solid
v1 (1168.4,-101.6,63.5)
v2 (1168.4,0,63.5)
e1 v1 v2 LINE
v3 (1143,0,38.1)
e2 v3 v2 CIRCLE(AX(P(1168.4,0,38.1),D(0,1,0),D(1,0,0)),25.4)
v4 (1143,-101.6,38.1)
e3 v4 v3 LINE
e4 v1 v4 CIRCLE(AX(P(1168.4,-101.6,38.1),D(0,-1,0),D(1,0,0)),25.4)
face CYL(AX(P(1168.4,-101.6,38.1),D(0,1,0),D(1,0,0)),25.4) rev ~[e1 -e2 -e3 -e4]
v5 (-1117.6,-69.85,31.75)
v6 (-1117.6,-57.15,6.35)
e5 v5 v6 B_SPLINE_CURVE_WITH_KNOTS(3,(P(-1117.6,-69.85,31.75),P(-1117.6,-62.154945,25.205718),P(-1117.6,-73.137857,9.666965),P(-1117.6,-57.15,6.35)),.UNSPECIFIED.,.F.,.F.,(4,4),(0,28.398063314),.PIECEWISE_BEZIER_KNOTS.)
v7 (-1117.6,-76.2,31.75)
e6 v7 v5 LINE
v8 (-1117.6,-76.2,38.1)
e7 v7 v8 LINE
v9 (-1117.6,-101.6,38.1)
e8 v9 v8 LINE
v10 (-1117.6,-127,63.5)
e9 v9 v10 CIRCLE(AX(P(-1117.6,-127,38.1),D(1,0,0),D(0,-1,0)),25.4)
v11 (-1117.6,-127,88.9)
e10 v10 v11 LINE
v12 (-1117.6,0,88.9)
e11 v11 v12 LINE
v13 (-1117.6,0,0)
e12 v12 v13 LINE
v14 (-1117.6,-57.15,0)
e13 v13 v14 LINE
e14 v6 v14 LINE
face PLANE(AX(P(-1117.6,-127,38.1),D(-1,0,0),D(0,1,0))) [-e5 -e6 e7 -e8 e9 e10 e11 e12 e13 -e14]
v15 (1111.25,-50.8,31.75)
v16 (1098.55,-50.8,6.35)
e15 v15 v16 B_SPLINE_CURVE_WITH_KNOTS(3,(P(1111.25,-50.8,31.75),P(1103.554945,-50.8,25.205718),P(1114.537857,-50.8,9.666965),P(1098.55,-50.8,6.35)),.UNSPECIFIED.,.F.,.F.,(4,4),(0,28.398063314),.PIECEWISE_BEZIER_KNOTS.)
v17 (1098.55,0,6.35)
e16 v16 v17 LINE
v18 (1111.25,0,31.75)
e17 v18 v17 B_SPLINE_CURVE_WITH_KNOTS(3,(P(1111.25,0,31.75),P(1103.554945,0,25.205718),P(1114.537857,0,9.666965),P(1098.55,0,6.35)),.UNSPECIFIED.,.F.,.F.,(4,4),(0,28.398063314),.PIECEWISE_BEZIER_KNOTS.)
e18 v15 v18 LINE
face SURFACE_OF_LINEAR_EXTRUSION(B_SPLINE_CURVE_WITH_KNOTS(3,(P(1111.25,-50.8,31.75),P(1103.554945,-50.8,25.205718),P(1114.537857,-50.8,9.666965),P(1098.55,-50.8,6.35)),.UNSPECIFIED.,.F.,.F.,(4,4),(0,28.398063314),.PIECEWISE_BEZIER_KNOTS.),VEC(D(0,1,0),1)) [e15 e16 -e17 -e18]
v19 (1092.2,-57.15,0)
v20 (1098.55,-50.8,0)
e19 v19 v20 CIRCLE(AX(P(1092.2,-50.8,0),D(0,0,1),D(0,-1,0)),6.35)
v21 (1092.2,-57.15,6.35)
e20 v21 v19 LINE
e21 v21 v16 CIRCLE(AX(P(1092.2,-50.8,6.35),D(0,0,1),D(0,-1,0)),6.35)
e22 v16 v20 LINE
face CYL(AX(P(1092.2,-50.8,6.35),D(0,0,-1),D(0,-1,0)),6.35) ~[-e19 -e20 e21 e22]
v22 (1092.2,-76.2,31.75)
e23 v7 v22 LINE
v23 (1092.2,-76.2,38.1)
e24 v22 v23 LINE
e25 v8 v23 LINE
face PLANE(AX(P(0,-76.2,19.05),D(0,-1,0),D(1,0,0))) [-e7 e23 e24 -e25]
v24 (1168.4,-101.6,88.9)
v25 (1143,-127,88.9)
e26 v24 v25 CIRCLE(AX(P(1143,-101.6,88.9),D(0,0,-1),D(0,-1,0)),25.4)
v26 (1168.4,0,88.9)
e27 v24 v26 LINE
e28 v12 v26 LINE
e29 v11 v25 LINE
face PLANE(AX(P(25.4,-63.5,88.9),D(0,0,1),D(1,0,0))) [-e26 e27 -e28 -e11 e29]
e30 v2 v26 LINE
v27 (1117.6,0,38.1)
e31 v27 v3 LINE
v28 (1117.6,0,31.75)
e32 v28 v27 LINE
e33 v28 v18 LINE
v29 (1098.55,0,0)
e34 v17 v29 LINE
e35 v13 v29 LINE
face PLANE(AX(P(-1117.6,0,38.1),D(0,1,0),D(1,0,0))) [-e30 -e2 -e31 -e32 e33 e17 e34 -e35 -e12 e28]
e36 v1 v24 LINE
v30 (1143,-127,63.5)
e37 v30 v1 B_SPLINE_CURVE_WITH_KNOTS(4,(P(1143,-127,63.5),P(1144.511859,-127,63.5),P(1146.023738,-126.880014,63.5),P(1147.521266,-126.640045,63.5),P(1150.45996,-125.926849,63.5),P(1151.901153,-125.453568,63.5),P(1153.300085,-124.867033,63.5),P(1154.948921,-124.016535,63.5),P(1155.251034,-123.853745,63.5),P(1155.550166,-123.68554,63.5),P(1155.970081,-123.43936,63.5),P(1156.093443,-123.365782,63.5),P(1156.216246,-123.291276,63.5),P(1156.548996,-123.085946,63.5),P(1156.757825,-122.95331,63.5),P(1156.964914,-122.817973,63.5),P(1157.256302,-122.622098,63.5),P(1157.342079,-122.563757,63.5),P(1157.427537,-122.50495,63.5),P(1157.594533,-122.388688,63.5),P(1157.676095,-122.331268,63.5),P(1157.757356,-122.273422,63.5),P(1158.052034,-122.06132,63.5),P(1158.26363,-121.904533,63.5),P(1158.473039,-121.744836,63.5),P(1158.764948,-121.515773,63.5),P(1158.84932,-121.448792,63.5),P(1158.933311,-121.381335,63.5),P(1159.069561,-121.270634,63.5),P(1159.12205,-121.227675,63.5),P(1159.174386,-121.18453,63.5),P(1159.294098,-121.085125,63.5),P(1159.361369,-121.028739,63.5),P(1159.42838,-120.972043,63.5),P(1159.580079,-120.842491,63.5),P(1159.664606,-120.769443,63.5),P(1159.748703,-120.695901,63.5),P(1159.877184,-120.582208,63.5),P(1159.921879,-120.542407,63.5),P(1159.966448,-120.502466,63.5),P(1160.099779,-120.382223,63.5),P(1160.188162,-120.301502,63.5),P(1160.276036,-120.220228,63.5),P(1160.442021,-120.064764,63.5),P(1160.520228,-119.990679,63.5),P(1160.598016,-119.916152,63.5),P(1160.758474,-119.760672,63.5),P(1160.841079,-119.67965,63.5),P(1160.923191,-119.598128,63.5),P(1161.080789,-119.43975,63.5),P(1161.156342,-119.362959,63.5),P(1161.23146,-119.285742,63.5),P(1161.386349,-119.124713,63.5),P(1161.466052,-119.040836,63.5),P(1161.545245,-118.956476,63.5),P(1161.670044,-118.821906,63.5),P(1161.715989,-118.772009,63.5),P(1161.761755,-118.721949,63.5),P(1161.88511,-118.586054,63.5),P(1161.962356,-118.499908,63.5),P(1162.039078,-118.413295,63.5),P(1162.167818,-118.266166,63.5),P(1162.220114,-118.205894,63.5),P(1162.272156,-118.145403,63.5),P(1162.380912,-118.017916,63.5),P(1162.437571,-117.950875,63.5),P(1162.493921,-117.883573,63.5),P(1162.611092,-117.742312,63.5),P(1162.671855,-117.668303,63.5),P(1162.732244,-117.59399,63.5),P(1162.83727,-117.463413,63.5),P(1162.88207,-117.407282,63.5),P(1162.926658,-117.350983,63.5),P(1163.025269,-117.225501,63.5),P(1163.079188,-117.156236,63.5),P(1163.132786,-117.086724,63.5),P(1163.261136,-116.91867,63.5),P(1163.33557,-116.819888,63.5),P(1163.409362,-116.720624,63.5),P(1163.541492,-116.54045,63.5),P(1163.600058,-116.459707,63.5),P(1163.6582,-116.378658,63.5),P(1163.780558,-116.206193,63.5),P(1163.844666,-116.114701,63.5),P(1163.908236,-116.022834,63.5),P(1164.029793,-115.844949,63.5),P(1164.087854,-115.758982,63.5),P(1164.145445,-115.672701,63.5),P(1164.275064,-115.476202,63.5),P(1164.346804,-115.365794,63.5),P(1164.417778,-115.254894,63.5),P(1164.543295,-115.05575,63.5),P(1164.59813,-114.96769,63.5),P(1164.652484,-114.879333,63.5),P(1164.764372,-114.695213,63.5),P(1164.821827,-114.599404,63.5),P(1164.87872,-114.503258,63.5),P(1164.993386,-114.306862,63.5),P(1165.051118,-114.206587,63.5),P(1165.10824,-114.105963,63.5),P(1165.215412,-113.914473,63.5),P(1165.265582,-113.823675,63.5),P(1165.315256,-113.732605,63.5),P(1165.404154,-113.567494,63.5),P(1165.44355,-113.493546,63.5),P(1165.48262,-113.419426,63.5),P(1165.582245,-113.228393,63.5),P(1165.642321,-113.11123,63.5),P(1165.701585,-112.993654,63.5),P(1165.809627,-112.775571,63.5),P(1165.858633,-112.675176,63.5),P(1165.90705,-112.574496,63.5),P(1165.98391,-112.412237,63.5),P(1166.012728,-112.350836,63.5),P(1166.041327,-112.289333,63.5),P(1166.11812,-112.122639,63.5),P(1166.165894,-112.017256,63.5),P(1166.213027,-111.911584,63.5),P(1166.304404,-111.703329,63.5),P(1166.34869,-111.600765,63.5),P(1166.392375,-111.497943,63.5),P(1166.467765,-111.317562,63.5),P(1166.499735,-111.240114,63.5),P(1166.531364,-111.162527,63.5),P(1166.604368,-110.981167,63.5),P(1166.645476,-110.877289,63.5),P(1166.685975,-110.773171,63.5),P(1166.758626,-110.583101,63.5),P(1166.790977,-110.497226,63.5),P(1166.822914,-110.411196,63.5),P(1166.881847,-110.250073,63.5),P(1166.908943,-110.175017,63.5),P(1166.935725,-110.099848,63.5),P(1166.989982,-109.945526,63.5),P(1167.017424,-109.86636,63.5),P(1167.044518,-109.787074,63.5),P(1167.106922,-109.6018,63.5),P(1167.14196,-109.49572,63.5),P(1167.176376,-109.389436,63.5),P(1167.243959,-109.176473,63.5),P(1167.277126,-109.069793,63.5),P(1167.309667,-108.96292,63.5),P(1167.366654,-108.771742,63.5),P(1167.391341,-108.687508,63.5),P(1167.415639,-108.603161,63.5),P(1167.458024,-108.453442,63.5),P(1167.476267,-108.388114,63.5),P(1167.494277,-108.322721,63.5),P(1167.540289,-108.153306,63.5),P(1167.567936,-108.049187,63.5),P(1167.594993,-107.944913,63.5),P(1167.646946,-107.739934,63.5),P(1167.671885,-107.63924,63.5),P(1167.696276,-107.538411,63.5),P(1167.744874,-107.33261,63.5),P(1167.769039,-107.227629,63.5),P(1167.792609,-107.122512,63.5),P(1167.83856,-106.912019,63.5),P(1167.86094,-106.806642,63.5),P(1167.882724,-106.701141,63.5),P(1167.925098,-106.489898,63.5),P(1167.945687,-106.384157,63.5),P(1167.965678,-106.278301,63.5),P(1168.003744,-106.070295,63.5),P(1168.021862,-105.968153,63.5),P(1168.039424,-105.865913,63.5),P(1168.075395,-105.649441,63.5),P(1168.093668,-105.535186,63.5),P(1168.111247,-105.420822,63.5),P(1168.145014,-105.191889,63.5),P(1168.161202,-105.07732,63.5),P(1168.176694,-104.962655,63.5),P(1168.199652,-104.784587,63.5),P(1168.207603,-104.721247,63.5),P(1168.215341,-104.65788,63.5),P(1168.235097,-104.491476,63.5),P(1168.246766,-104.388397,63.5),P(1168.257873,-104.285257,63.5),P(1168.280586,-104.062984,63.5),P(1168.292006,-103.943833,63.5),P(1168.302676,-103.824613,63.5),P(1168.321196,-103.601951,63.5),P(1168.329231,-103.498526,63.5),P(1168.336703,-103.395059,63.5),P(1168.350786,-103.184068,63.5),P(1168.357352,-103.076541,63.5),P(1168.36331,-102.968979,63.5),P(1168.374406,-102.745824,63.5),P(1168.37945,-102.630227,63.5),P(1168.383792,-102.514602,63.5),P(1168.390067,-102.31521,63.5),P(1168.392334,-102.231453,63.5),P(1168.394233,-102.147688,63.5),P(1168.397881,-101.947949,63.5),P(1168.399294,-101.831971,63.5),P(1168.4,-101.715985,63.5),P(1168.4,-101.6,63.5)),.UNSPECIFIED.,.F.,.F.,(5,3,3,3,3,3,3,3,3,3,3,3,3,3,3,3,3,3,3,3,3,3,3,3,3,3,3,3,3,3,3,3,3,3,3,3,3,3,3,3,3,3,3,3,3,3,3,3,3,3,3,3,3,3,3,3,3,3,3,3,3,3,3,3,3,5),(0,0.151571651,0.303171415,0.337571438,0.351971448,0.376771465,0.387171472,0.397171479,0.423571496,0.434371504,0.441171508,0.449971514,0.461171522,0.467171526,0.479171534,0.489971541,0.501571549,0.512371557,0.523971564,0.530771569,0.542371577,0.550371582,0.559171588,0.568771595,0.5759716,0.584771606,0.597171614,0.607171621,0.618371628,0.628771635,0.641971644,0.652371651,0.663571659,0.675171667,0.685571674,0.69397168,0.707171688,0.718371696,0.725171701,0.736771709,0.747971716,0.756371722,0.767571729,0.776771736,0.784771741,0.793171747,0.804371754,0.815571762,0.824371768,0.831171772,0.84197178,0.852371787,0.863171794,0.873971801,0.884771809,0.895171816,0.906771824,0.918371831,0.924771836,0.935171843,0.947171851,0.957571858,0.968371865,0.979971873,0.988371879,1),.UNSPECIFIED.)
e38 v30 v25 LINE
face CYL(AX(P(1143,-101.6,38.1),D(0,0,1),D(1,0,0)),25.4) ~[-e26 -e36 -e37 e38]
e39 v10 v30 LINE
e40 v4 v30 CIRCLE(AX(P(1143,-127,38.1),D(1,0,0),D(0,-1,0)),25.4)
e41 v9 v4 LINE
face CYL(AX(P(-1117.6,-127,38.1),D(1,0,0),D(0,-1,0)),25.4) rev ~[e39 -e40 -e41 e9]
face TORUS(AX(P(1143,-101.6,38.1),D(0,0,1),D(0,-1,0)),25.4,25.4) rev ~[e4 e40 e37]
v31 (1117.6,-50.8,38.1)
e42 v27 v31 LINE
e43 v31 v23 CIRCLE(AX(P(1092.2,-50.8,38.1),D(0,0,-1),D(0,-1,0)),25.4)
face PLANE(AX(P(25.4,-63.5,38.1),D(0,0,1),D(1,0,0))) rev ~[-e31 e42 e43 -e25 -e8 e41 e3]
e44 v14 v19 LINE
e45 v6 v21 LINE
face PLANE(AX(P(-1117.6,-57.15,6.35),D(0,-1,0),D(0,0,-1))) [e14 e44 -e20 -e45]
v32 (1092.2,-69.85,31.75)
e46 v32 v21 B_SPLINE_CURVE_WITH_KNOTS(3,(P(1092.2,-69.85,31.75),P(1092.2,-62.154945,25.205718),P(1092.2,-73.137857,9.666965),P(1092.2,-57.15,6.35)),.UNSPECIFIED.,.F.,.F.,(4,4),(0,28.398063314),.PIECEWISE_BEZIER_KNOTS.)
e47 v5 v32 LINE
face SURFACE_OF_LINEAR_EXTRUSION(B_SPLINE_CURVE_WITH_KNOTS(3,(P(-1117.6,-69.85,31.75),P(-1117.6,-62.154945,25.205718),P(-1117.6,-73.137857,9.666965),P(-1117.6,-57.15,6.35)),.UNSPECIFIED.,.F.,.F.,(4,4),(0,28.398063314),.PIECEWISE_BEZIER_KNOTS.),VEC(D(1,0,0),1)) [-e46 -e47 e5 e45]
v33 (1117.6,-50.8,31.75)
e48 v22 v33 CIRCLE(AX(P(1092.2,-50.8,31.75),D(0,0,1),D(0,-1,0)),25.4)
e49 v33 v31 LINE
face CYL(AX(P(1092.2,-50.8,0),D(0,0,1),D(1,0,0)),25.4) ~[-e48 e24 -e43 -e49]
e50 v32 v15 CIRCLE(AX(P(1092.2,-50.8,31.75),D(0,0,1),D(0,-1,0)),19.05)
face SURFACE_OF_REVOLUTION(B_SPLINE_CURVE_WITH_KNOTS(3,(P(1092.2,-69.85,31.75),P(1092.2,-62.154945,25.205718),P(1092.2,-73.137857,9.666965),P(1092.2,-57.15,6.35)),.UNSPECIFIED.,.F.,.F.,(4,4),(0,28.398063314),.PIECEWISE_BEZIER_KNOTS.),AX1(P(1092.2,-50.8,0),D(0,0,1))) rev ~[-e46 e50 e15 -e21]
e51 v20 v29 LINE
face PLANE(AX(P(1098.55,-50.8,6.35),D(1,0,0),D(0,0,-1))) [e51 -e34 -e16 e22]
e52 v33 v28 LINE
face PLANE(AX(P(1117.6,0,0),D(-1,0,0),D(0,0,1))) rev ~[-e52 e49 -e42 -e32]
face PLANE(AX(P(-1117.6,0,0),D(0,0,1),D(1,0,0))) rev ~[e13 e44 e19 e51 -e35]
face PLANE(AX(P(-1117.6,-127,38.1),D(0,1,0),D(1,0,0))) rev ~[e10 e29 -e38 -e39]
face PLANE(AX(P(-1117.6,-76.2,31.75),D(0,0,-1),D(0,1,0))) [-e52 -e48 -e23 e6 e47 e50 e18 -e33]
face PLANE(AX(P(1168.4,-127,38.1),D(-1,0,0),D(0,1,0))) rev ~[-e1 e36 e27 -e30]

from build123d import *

# Parameters (mm, degrees)
F0_W     = 2235.2
F0_H     = 38.1
F1_DEPTH = 76.2
F2_R     = 25.4
F5_W     = 2286
F5_H     = 127
F6_DEPTH = 50.8
F7_R     = 25.4
F8_R     = 25.4


# Not quite as in the source:
# - after a boolean that leaves OpenCascade's solid faulty, fix() repairs it


with BuildPart() as f1:
    # F0 (on Front) → F1 (new body)
    with BuildSketch(Plane.XZ):
        with Locations((0, 19.05)):
            Rectangle(F0_W, F0_H)
    extrude(amount=F1_DEPTH)

    # F2
    f2_edges = [f1.edges().sort_by_distance(p)[0] for p in [
        (1117.6, -76.2, 19.05),
    ]]
    fillet(f2_edges, radius=F2_R)

    # F4: sweep along a path in F4_path
    with BuildLine(Plane(origin=(1092.2, -76.2, 0), x_dir=(0, -1, 0), z_dir=(0, 0, -1))) as f4_path:
        Line((0, 2209.8), (0, 0))
        ThreePointArc((0, 0), (-7.4394877579, -17.9605122421), (-25.4, -25.4))
        Line((-25.4, -25.4), (-76.2, -25.4))
    # F3 (on face) → F4 (sweep, cut)
    with BuildSketch(Plane(origin=(-1117.6, 0, 0), x_dir=(0, -1, 0), z_dir=(-1, 0, 0))):
        with BuildLine():
            Line((57.15, 6.35), (57.15, 0))
            Line((57.15, 0), (76.2, 0))
            Line((76.2, 0), (76.2, 31.75))
            Line((76.2, 31.75), (69.85, 31.75))
            add(Edge.make_bspline(
                [(57.15, 6.35), (73.1378570199, 9.6669653431), (62.1549449861, 25.2057183534), (69.85, 31.75)],
                knots=[0, 0, 0, 0, 28.3980633142, 28.3980633142, 28.3980633142, 28.3980633142], degree=3))
        make_face()
    sweep(path=f4_path.line, mode=Mode.SUBTRACT)

    # F5 (on face) → F6 (join)
    with BuildSketch(Plane.XY.offset(38.1)):
        with Locations((25.4, -63.5)):
            Rectangle(F5_W, F5_H)
    extrude(amount=F6_DEPTH)

    # F7
    f7_edges = [f1.edges().sort_by_distance(p)[0] for p in [
        (1168.4, -127, 63.5),
    ]]
    fillet(f7_edges, radius=F7_R)

    # F9: sweep along a path in F9_path
    with BuildLine(Plane(origin=(1143, -127, 38.1), x_dir=(0, -1, 0), z_dir=(0, 0, -1))) as f9_path:
        Line((0, 2260.6), (0, 0))
        ThreePointArc((0, 0), (-7.4394877579, -17.9605122421), (-25.4, -25.4))
        Line((-25.4, -25.4), (-127, -25.4))
    # F8 (on face) → F9 (sweep, cut)
    with BuildSketch(Plane(origin=(-1117.6, 0, 0), x_dir=(0, -1, 0), z_dir=(-1, 0, 0))):
        with Locations((127, 38.1)):
            Circle(F8_R)
    sweep(path=f9_path.line, mode=Mode.SUBTRACT)

    add(f1.part.fix(), mode=Mode.REPLACE)


solid = f1.part
